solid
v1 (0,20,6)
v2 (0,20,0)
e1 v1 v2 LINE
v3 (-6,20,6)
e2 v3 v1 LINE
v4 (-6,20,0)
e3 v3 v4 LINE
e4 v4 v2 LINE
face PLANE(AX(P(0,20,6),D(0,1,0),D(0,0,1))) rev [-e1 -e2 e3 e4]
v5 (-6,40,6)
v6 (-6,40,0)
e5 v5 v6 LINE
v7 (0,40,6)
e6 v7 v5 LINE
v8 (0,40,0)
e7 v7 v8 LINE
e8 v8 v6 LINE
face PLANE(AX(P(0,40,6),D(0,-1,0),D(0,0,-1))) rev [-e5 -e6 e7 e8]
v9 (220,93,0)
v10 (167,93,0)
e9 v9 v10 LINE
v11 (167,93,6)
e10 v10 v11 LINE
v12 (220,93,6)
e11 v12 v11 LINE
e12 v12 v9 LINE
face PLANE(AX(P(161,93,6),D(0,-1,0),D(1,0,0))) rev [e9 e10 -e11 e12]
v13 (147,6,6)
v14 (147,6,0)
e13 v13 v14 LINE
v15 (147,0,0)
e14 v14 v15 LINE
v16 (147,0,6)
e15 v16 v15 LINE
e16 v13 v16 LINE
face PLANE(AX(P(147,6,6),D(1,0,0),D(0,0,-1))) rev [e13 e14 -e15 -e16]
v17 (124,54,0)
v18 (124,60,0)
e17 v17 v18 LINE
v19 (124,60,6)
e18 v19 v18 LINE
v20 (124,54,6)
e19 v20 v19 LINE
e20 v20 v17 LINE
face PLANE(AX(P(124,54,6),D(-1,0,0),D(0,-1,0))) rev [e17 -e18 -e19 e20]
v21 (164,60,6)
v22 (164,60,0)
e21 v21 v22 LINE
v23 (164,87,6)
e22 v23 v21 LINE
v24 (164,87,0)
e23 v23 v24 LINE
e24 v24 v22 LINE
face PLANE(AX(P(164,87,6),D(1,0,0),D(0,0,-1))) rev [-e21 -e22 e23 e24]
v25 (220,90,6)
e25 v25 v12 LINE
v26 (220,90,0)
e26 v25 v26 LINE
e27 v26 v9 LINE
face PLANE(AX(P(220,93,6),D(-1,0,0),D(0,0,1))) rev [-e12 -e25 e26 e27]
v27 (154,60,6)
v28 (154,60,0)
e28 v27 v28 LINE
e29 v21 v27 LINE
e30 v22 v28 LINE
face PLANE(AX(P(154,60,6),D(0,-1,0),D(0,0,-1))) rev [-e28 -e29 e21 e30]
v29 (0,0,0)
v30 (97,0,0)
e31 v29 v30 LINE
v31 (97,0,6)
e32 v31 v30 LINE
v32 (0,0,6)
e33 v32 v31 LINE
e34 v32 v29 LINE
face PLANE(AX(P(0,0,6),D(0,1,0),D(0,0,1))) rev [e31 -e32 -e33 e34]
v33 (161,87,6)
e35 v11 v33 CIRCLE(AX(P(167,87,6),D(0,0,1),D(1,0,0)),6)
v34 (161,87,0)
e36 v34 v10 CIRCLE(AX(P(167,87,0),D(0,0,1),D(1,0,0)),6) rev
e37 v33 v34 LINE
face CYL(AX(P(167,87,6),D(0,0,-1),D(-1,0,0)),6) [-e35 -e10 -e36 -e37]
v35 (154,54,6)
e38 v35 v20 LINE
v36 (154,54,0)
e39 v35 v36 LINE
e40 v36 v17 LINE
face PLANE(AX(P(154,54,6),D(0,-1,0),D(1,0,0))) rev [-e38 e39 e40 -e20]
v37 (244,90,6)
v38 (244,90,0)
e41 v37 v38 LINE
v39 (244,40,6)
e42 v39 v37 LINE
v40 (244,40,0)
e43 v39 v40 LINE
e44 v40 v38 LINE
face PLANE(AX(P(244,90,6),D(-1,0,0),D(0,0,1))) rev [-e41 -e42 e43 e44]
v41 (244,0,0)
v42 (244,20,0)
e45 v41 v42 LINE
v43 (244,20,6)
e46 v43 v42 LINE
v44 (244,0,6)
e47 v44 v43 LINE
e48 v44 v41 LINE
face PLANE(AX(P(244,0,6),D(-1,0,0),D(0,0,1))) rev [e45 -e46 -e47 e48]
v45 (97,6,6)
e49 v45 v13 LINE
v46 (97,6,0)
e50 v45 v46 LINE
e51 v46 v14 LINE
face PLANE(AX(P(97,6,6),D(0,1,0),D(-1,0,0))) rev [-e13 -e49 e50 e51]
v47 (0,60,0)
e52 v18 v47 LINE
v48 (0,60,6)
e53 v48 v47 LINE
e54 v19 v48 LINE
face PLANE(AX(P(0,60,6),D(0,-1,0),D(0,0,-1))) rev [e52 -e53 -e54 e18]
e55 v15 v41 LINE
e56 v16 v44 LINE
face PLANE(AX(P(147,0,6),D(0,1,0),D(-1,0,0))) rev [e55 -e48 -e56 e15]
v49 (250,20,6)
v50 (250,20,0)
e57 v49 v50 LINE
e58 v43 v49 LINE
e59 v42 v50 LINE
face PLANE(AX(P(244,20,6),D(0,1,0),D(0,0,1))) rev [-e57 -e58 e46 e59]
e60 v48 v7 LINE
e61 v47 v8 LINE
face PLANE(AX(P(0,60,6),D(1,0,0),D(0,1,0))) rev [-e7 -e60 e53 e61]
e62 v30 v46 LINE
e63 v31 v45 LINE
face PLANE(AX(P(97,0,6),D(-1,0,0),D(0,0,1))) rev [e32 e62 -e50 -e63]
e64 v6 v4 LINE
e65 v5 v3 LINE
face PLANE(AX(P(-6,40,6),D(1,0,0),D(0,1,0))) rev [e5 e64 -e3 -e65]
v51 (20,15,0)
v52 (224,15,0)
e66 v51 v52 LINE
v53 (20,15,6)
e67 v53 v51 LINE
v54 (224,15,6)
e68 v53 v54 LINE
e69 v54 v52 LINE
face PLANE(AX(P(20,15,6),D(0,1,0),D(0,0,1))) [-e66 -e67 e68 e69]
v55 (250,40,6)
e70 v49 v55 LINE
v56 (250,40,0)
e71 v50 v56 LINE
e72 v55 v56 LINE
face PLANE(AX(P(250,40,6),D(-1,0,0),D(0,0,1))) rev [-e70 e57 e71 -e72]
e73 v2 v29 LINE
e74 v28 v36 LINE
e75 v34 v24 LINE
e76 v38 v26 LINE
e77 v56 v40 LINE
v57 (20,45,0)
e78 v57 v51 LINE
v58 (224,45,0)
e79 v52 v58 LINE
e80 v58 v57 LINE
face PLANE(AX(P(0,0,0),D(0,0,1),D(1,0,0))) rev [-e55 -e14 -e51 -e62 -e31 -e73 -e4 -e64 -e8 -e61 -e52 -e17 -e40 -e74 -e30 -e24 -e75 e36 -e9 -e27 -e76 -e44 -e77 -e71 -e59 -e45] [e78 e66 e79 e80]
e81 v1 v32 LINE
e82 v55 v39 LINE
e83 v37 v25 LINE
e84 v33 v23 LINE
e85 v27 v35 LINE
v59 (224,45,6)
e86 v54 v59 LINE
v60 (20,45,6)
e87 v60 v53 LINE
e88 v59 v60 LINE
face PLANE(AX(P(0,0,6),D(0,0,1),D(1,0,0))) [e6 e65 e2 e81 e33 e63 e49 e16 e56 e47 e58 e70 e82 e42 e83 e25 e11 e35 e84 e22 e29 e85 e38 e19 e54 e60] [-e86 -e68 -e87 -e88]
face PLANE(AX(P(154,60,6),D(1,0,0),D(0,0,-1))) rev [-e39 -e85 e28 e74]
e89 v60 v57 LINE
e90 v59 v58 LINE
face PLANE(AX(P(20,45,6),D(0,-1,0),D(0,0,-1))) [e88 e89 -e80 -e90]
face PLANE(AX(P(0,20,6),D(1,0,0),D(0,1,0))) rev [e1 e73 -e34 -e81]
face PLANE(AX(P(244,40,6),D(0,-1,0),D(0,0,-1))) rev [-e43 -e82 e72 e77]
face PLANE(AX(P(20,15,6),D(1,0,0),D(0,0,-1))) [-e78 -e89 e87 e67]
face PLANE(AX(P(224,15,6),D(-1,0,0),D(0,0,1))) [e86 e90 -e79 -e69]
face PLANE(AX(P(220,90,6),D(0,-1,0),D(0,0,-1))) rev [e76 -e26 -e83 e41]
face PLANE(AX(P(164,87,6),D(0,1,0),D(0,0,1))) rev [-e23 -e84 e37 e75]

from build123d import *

# Parameters (mm, degrees)
SKETCH_1_W      = 204
SKETCH_1_H      = 30
EXTRUDE_1_DEPTH = 6
FILLET_1_R      = 6


with BuildPart() as part:
    # Эскиз1 → Бобышка-Вытянуть1 (new body)
    with BuildSketch(Plane.XY):
        Polygon((0, 20), (0, 0), (97, 0), (97, 6), (147, 6), (147, 0), (244, 0), (244, 20), (250, 20), (250, 40), (244, 40), (244, 90), (220, 90), (220, 93), (161, 93), (161, 87), (164, 87), (164, 60), (154, 60), (154, 54), (124, 54), (124, 60), (0, 60), (0, 40), (-6, 40), (-6, 20), align=None)
        with Locations((122, 30)):
            Rectangle(SKETCH_1_W, SKETCH_1_H, mode=Mode.SUBTRACT)
    extrude(amount=EXTRUDE_1_DEPTH)

    # Скругление1
    fillet_1_edges = [part.edges().sort_by_distance(p)[0] for p in [
        (161, 93, 3),
    ]]
    fillet(fillet_1_edges, radius=FILLET_1_R - 0.0001)  # a hair under: the kernel refuses the full size


solid = part.part
